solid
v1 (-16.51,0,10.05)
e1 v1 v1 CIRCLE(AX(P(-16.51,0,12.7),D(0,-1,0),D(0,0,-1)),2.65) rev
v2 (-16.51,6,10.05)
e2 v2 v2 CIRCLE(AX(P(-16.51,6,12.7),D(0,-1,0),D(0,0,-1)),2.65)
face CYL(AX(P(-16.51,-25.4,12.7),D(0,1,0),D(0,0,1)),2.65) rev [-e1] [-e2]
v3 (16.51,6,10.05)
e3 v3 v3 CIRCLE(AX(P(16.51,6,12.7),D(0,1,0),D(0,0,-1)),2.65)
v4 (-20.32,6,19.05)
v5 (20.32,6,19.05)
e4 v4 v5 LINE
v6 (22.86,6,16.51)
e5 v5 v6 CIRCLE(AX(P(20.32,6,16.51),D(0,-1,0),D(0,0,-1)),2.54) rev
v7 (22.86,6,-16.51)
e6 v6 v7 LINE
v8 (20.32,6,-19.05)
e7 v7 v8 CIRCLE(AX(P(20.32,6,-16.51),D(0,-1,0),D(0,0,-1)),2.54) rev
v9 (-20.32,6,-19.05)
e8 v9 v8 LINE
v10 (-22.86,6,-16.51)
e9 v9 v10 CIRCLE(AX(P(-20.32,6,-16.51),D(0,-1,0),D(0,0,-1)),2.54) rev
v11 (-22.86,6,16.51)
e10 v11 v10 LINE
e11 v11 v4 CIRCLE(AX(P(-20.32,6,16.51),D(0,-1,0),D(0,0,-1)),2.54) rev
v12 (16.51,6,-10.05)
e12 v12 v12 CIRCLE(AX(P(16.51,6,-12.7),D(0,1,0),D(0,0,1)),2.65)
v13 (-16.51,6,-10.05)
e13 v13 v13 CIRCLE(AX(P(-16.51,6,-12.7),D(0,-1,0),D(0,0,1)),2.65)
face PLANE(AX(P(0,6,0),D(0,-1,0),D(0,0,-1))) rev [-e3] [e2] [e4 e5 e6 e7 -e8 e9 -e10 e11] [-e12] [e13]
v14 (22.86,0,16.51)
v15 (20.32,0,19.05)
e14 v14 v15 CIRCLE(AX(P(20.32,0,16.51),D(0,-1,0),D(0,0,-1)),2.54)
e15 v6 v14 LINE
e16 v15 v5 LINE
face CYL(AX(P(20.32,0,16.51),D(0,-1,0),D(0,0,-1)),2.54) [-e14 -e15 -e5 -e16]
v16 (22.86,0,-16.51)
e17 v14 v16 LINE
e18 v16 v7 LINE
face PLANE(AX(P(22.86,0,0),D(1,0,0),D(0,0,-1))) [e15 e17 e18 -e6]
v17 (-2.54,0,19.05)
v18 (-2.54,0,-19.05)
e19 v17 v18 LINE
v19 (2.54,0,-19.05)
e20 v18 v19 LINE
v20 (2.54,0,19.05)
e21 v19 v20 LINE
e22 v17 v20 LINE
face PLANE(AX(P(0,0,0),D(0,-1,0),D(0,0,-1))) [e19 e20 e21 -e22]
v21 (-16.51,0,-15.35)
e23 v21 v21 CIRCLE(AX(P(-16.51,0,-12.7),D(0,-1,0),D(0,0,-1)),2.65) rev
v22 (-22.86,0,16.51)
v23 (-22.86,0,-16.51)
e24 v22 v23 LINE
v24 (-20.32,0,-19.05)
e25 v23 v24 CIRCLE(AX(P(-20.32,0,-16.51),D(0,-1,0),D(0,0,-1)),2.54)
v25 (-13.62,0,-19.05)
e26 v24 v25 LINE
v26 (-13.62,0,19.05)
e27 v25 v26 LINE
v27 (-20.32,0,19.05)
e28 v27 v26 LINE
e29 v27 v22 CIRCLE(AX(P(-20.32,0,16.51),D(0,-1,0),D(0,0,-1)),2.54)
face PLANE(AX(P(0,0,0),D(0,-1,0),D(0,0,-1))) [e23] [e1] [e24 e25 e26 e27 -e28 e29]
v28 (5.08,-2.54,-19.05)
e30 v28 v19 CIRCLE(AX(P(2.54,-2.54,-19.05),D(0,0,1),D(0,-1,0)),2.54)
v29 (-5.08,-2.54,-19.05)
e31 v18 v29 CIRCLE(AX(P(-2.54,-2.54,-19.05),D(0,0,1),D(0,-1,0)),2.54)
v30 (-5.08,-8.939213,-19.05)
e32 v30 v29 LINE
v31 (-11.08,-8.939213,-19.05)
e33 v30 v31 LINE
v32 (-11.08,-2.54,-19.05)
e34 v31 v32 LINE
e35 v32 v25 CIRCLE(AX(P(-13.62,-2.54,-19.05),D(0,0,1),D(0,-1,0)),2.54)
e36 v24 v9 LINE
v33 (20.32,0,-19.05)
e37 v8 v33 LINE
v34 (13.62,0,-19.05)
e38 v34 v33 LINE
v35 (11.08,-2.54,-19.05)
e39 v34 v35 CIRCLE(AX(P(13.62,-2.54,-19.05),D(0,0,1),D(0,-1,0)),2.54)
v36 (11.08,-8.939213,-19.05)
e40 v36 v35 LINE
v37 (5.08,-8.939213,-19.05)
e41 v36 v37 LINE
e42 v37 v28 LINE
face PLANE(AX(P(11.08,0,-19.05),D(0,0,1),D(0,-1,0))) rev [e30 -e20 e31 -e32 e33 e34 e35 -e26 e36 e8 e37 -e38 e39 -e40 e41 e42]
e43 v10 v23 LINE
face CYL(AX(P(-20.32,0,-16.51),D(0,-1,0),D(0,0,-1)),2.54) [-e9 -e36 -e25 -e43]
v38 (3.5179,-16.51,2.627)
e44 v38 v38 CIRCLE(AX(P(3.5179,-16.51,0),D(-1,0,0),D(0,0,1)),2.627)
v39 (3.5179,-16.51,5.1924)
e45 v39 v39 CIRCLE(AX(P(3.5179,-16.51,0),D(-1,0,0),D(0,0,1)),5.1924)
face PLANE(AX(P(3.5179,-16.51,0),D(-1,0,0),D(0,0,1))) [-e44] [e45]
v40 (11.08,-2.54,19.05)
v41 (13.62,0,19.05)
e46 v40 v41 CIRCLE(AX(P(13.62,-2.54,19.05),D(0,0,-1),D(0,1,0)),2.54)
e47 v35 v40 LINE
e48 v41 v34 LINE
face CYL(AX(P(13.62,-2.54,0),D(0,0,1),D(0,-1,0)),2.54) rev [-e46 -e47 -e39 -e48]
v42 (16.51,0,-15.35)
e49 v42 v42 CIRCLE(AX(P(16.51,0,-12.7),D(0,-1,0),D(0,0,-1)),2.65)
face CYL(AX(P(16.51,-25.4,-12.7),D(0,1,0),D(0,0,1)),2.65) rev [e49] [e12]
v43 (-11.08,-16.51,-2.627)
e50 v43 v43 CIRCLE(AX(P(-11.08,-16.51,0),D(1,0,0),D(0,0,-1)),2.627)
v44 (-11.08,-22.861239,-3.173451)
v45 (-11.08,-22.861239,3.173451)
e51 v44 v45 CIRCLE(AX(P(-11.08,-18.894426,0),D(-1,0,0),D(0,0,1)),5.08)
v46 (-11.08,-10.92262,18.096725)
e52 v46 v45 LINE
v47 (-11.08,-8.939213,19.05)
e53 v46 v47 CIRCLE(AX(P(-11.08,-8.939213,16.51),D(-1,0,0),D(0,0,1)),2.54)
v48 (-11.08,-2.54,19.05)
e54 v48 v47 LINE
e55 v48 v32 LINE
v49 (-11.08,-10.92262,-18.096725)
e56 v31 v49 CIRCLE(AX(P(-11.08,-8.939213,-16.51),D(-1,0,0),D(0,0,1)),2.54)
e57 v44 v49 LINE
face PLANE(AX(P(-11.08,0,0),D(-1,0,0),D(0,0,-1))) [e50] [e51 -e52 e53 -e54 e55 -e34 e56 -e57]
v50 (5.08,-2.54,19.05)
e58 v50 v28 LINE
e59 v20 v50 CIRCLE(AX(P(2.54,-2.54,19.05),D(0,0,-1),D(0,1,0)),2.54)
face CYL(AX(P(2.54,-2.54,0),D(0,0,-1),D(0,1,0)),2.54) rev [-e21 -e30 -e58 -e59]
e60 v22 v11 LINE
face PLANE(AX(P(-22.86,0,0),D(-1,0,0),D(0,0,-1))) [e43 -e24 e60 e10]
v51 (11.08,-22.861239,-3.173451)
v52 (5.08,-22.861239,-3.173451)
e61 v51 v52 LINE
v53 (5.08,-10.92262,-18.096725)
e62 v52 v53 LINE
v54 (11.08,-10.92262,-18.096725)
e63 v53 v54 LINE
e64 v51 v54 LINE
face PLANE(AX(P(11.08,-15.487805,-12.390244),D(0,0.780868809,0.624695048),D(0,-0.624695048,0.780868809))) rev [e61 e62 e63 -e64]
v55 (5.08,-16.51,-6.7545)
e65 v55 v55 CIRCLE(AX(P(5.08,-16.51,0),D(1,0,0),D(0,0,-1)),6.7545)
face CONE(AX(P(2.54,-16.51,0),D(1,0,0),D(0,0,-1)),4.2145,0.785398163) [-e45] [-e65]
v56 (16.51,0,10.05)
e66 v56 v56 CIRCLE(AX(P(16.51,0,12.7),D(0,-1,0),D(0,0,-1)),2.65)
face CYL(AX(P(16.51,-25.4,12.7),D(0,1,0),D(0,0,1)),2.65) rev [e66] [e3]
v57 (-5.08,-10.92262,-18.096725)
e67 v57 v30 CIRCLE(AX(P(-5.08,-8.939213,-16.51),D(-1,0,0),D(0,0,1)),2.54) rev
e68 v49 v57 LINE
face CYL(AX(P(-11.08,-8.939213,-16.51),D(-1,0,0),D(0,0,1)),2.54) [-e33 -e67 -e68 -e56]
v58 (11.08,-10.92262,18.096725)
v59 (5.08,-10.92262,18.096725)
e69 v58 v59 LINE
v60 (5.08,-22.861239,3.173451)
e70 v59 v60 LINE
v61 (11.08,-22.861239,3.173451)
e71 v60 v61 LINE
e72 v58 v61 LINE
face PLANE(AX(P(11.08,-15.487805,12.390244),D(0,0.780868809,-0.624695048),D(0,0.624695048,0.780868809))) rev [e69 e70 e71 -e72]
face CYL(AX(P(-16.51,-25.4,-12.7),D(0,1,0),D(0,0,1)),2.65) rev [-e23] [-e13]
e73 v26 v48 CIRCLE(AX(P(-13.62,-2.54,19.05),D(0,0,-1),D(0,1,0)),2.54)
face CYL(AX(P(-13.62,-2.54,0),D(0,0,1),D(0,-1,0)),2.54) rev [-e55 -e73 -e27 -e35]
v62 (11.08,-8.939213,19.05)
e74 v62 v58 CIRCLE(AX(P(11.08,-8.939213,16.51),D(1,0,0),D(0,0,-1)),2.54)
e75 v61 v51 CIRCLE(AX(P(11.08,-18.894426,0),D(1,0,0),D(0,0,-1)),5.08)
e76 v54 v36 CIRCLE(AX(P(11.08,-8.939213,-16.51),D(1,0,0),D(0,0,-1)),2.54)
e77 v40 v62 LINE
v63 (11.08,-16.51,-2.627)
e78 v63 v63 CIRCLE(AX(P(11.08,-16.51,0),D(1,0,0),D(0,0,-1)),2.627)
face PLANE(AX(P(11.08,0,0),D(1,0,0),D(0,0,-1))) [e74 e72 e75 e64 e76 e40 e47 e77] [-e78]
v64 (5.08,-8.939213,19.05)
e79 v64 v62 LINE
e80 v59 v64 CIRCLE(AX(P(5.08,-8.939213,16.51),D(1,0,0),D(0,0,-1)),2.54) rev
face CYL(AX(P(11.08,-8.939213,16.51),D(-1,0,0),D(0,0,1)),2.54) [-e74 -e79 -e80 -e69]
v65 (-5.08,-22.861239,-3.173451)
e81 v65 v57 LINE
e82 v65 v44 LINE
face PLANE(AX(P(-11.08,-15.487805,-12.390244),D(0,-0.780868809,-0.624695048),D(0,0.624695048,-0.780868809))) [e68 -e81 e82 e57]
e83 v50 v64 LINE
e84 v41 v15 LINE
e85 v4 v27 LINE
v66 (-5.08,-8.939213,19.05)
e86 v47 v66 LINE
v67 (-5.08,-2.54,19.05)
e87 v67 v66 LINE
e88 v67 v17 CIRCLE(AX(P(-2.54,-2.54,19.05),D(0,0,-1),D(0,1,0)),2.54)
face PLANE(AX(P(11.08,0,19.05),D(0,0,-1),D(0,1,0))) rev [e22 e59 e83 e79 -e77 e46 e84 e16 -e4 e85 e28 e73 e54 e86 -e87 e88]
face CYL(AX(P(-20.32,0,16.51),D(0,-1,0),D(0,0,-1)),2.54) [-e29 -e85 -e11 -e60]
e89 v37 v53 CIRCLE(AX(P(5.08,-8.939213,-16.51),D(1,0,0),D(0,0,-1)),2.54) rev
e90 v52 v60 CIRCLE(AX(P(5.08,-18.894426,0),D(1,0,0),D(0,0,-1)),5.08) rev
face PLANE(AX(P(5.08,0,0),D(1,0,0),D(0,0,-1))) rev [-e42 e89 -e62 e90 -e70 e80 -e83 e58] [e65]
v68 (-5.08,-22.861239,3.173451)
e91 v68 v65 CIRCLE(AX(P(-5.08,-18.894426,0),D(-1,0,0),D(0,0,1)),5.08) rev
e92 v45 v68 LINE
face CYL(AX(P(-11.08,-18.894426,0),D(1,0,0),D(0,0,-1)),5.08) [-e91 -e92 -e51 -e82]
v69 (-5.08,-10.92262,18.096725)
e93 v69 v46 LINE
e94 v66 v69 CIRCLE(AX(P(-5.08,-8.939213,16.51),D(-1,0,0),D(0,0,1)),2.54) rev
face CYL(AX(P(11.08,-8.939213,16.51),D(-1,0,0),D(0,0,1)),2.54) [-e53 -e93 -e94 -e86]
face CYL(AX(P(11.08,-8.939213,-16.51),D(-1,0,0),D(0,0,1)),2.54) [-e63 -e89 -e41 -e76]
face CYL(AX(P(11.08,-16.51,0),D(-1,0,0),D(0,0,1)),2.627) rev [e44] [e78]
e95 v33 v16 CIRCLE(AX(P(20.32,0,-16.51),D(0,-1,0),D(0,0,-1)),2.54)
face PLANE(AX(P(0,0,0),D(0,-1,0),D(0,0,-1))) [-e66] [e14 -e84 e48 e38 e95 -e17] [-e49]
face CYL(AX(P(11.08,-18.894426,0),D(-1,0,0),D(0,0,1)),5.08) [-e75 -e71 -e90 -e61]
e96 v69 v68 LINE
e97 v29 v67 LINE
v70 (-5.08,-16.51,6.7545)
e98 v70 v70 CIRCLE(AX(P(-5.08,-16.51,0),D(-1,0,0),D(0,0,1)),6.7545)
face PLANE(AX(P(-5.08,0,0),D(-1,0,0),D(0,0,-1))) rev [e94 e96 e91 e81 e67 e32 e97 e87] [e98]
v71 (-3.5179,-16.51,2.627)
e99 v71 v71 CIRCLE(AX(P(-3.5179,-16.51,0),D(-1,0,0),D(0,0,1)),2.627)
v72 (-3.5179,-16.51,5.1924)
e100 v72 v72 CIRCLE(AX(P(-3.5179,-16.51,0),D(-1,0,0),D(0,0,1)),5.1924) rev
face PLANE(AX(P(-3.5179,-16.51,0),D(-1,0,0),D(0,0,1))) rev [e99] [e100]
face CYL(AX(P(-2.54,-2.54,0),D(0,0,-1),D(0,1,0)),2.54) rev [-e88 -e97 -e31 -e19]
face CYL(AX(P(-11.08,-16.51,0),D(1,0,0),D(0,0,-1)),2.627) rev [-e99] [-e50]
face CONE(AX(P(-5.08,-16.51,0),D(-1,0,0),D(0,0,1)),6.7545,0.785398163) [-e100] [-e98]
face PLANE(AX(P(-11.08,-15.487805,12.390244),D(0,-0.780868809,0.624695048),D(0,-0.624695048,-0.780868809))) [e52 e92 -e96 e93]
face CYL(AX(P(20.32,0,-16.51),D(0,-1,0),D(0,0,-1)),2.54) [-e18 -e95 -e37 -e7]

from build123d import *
from OCP.BRepFilletAPI import BRepFilletAPI_MakeFillet

# Parameters (mm, degrees)
SKETCH1_R           = 2.627
BOSS_EXTRUDE1_DEPTH = 6
BOSS_EXTRUDE2_START = -5.08
SKETCH1_3_W         = 38.1
SKETCH1_3_H         = 5.999999938
BOSS_EXTRUDE2_DEPTH = 22.86
SKETCH3_R           = 2.65
CUT_EXTRUDE1_DEPTH  = 44.260167546
FILLET1_R1          = 2.54
FILLET1_R2          = 5.08
SKETCH4_R           = 4.2145
SKETCH4_R_2         = 2.627
BOSS_EXTRUDE3_DEPTH = 1.5621
BOSS_EXTRUDE4_START = 8.5979
SKETCH4_2_R         = 4.2145
SKETCH4_2_R_2       = 2.627
BOSS_EXTRUDE4_DEPTH = 1.5621
CHAMFER2_SIZE       = 2.54


with BuildPart() as part:
    # Sketch1 → Boss-Extrude1 (new body)
    with BuildSketch(Plane(origin=(5.08, 0, 0), x_dir=(0, 0, -1), z_dir=(1, 0, 0))):
        Polygon((-19.05, 0), (-19.05, -10.16), (0, -25.4), (19.05, -10.16), (19.05, 0), align=None)
        with Locations((0, -16.51)):
            Circle(SKETCH1_R, mode=Mode.SUBTRACT)
    boss_extrude1 = extrude(amount=BOSS_EXTRUDE1_DEPTH)

    # Sketch1<3> → Boss-Extrude2 (add)
    with BuildSketch(Plane(origin=(5.08, 0, 0), x_dir=(0, 0, -1), z_dir=(1, 0, 0)).offset(BOSS_EXTRUDE2_START)):
        with Locations((0, 2.999999969)):
            Rectangle(SKETCH1_3_W, SKETCH1_3_H)
    boss_extrude2 = extrude(amount=BOSS_EXTRUDE2_DEPTH)

    # Sketch3 → Cut-Extrude1 (cut, through all)
    with BuildSketch(Plane(origin=(0, 5.999999938, 0), x_dir=(1, 0, 0), z_dir=(0, 1, 0))):
        with Locations(Location((16.51, 12.7, 0), (0, 0, 270))):
            Circle(SKETCH3_R)
        with Locations(Location((16.51, -12.7, 0), (0, 0, 90))):
            Circle(SKETCH3_R)
    cut_extrude1 = extrude(amount=-CUT_EXTRUDE1_DEPTH, mode=Mode.SUBTRACT)

    # Mirror2: Boss-Extrude2, Cut-Extrude1 across plane
    add(boss_extrude2.mirror(Plane(origin=(0, 0, 0), x_dir=(0, 0, 1), z_dir=(1, 0, 0))))
    add(cut_extrude1.mirror(Plane(origin=(0, 0, 0), x_dir=(0, 0, 1), z_dir=(1, 0, 0))), mode=Mode.SUBTRACT)

    # Mirror3: Boss-Extrude1 across plane
    add(boss_extrude1.mirror(Plane(origin=(0, 0, 0), x_dir=(0, 0, 1), z_dir=(1, 0, 0))))

    # Fillet1: one fillet with a radius per group of edges: ONE call of the kernel's fillet builder (fillet() takes one radius for all edges)
    fillet1_edges_1 = [part.edges().sort_by_distance(p)[0] for p in [
        (8.08, -10.16, 19.05),
        (8.08, -10.16, -19.05),
        (11.08, 0, 0),
        (22.86, 2.999999969, 19.05),
        (22.86, 2.999999969, -19.05),
        (-22.86, 2.999999969, -19.05),
        (-22.86, 2.999999969, 19.05),
        (-8.08, -10.16, -19.05),
        (-8.08, -10.16, 19.05),
        (-5.08, 0, 0),
        (-11.08, 0, 0),
        (5.08, 0, 0),
    ]]
    fillet1_edges_2 = [part.edges().sort_by_distance(p)[0] for p in [
        (8.08, -25.4, 0),
        (-8.08, -25.4, 0),
    ]]
    fillet1 = BRepFilletAPI_MakeFillet(part.part.solid().wrapped)
    for e in fillet1_edges_1:
        fillet1.Add(FILLET1_R1, e.wrapped)
    for e in fillet1_edges_2:
        fillet1.Add(FILLET1_R2, e.wrapped)
    add(Compound.cast(fillet1.Shape()), mode=Mode.REPLACE)

    # Sketch4 → Boss-Extrude3 (add)
    with BuildSketch(Plane.ZY.offset(-5.08)):
        with Locations(Location((0, -16.51, 0), (0, 0, 180))):
            Circle(SKETCH4_R)
        with Locations((0, -16.51)):
            Circle(SKETCH4_R_2, mode=Mode.SUBTRACT)
    extrude(amount=BOSS_EXTRUDE3_DEPTH)

    # Sketch4<2> → Boss-Extrude4 (add)
    with BuildSketch(Plane.ZY.offset(-5.08).offset(BOSS_EXTRUDE4_START)):
        with Locations(Location((0, -16.51, 0), (0, 0, 180))):
            Circle(SKETCH4_2_R)
        with Locations((0, -16.51)):
            Circle(SKETCH4_2_R_2, mode=Mode.SUBTRACT)
    extrude(amount=BOSS_EXTRUDE4_DEPTH)

    # Chamfer2
    # the kernel refuses this chamfer: 2.54 mm, written as the material it adds along each edge
    with BuildSketch(Plane(origin=(5.08, -16.51, 0), x_dir=(0, 0, -1), z_dir=(0, 1, 0))) as chamfer2_piece_1_section:
        Polygon((4.2145 + CHAMFER2_SIZE, 0), (4.2145, CHAMFER2_SIZE), (4.2145, 0), align=None)
    chamfer2_piece_1 = revolve(axis=Axis((5.08, -16.51, 0), (-1, 0, 0)), mode=Mode.PRIVATE)
    chamfer2_piece_1 = split(chamfer2_piece_1, bisect_by=Plane(origin=(3.5179, -16.51, 5.976913078), z_dir=(1, 0, 0)), keep=Keep.TOP, mode=Mode.PRIVATE)
    add(chamfer2_piece_1)
    with BuildSketch(Plane(origin=(-5.08, -16.51, 0), x_dir=(0, 0, -1), z_dir=(0, 1, 0))) as chamfer2_piece_2_section:
        Polygon((4.2145 + CHAMFER2_SIZE, 0), (4.2145, -CHAMFER2_SIZE), (4.2145, 0), align=None)
    chamfer2_piece_2 = revolve(axis=Axis((-5.08, -16.51, 0), (-1, 0, 0)), mode=Mode.PRIVATE)
    chamfer2_piece_2 = split(chamfer2_piece_2, bisect_by=Plane(origin=(-3.5179, -16.51, 5.976913078), z_dir=(-1, 0, 0)), keep=Keep.TOP, mode=Mode.PRIVATE)
    add(chamfer2_piece_2)


solid = part.part
